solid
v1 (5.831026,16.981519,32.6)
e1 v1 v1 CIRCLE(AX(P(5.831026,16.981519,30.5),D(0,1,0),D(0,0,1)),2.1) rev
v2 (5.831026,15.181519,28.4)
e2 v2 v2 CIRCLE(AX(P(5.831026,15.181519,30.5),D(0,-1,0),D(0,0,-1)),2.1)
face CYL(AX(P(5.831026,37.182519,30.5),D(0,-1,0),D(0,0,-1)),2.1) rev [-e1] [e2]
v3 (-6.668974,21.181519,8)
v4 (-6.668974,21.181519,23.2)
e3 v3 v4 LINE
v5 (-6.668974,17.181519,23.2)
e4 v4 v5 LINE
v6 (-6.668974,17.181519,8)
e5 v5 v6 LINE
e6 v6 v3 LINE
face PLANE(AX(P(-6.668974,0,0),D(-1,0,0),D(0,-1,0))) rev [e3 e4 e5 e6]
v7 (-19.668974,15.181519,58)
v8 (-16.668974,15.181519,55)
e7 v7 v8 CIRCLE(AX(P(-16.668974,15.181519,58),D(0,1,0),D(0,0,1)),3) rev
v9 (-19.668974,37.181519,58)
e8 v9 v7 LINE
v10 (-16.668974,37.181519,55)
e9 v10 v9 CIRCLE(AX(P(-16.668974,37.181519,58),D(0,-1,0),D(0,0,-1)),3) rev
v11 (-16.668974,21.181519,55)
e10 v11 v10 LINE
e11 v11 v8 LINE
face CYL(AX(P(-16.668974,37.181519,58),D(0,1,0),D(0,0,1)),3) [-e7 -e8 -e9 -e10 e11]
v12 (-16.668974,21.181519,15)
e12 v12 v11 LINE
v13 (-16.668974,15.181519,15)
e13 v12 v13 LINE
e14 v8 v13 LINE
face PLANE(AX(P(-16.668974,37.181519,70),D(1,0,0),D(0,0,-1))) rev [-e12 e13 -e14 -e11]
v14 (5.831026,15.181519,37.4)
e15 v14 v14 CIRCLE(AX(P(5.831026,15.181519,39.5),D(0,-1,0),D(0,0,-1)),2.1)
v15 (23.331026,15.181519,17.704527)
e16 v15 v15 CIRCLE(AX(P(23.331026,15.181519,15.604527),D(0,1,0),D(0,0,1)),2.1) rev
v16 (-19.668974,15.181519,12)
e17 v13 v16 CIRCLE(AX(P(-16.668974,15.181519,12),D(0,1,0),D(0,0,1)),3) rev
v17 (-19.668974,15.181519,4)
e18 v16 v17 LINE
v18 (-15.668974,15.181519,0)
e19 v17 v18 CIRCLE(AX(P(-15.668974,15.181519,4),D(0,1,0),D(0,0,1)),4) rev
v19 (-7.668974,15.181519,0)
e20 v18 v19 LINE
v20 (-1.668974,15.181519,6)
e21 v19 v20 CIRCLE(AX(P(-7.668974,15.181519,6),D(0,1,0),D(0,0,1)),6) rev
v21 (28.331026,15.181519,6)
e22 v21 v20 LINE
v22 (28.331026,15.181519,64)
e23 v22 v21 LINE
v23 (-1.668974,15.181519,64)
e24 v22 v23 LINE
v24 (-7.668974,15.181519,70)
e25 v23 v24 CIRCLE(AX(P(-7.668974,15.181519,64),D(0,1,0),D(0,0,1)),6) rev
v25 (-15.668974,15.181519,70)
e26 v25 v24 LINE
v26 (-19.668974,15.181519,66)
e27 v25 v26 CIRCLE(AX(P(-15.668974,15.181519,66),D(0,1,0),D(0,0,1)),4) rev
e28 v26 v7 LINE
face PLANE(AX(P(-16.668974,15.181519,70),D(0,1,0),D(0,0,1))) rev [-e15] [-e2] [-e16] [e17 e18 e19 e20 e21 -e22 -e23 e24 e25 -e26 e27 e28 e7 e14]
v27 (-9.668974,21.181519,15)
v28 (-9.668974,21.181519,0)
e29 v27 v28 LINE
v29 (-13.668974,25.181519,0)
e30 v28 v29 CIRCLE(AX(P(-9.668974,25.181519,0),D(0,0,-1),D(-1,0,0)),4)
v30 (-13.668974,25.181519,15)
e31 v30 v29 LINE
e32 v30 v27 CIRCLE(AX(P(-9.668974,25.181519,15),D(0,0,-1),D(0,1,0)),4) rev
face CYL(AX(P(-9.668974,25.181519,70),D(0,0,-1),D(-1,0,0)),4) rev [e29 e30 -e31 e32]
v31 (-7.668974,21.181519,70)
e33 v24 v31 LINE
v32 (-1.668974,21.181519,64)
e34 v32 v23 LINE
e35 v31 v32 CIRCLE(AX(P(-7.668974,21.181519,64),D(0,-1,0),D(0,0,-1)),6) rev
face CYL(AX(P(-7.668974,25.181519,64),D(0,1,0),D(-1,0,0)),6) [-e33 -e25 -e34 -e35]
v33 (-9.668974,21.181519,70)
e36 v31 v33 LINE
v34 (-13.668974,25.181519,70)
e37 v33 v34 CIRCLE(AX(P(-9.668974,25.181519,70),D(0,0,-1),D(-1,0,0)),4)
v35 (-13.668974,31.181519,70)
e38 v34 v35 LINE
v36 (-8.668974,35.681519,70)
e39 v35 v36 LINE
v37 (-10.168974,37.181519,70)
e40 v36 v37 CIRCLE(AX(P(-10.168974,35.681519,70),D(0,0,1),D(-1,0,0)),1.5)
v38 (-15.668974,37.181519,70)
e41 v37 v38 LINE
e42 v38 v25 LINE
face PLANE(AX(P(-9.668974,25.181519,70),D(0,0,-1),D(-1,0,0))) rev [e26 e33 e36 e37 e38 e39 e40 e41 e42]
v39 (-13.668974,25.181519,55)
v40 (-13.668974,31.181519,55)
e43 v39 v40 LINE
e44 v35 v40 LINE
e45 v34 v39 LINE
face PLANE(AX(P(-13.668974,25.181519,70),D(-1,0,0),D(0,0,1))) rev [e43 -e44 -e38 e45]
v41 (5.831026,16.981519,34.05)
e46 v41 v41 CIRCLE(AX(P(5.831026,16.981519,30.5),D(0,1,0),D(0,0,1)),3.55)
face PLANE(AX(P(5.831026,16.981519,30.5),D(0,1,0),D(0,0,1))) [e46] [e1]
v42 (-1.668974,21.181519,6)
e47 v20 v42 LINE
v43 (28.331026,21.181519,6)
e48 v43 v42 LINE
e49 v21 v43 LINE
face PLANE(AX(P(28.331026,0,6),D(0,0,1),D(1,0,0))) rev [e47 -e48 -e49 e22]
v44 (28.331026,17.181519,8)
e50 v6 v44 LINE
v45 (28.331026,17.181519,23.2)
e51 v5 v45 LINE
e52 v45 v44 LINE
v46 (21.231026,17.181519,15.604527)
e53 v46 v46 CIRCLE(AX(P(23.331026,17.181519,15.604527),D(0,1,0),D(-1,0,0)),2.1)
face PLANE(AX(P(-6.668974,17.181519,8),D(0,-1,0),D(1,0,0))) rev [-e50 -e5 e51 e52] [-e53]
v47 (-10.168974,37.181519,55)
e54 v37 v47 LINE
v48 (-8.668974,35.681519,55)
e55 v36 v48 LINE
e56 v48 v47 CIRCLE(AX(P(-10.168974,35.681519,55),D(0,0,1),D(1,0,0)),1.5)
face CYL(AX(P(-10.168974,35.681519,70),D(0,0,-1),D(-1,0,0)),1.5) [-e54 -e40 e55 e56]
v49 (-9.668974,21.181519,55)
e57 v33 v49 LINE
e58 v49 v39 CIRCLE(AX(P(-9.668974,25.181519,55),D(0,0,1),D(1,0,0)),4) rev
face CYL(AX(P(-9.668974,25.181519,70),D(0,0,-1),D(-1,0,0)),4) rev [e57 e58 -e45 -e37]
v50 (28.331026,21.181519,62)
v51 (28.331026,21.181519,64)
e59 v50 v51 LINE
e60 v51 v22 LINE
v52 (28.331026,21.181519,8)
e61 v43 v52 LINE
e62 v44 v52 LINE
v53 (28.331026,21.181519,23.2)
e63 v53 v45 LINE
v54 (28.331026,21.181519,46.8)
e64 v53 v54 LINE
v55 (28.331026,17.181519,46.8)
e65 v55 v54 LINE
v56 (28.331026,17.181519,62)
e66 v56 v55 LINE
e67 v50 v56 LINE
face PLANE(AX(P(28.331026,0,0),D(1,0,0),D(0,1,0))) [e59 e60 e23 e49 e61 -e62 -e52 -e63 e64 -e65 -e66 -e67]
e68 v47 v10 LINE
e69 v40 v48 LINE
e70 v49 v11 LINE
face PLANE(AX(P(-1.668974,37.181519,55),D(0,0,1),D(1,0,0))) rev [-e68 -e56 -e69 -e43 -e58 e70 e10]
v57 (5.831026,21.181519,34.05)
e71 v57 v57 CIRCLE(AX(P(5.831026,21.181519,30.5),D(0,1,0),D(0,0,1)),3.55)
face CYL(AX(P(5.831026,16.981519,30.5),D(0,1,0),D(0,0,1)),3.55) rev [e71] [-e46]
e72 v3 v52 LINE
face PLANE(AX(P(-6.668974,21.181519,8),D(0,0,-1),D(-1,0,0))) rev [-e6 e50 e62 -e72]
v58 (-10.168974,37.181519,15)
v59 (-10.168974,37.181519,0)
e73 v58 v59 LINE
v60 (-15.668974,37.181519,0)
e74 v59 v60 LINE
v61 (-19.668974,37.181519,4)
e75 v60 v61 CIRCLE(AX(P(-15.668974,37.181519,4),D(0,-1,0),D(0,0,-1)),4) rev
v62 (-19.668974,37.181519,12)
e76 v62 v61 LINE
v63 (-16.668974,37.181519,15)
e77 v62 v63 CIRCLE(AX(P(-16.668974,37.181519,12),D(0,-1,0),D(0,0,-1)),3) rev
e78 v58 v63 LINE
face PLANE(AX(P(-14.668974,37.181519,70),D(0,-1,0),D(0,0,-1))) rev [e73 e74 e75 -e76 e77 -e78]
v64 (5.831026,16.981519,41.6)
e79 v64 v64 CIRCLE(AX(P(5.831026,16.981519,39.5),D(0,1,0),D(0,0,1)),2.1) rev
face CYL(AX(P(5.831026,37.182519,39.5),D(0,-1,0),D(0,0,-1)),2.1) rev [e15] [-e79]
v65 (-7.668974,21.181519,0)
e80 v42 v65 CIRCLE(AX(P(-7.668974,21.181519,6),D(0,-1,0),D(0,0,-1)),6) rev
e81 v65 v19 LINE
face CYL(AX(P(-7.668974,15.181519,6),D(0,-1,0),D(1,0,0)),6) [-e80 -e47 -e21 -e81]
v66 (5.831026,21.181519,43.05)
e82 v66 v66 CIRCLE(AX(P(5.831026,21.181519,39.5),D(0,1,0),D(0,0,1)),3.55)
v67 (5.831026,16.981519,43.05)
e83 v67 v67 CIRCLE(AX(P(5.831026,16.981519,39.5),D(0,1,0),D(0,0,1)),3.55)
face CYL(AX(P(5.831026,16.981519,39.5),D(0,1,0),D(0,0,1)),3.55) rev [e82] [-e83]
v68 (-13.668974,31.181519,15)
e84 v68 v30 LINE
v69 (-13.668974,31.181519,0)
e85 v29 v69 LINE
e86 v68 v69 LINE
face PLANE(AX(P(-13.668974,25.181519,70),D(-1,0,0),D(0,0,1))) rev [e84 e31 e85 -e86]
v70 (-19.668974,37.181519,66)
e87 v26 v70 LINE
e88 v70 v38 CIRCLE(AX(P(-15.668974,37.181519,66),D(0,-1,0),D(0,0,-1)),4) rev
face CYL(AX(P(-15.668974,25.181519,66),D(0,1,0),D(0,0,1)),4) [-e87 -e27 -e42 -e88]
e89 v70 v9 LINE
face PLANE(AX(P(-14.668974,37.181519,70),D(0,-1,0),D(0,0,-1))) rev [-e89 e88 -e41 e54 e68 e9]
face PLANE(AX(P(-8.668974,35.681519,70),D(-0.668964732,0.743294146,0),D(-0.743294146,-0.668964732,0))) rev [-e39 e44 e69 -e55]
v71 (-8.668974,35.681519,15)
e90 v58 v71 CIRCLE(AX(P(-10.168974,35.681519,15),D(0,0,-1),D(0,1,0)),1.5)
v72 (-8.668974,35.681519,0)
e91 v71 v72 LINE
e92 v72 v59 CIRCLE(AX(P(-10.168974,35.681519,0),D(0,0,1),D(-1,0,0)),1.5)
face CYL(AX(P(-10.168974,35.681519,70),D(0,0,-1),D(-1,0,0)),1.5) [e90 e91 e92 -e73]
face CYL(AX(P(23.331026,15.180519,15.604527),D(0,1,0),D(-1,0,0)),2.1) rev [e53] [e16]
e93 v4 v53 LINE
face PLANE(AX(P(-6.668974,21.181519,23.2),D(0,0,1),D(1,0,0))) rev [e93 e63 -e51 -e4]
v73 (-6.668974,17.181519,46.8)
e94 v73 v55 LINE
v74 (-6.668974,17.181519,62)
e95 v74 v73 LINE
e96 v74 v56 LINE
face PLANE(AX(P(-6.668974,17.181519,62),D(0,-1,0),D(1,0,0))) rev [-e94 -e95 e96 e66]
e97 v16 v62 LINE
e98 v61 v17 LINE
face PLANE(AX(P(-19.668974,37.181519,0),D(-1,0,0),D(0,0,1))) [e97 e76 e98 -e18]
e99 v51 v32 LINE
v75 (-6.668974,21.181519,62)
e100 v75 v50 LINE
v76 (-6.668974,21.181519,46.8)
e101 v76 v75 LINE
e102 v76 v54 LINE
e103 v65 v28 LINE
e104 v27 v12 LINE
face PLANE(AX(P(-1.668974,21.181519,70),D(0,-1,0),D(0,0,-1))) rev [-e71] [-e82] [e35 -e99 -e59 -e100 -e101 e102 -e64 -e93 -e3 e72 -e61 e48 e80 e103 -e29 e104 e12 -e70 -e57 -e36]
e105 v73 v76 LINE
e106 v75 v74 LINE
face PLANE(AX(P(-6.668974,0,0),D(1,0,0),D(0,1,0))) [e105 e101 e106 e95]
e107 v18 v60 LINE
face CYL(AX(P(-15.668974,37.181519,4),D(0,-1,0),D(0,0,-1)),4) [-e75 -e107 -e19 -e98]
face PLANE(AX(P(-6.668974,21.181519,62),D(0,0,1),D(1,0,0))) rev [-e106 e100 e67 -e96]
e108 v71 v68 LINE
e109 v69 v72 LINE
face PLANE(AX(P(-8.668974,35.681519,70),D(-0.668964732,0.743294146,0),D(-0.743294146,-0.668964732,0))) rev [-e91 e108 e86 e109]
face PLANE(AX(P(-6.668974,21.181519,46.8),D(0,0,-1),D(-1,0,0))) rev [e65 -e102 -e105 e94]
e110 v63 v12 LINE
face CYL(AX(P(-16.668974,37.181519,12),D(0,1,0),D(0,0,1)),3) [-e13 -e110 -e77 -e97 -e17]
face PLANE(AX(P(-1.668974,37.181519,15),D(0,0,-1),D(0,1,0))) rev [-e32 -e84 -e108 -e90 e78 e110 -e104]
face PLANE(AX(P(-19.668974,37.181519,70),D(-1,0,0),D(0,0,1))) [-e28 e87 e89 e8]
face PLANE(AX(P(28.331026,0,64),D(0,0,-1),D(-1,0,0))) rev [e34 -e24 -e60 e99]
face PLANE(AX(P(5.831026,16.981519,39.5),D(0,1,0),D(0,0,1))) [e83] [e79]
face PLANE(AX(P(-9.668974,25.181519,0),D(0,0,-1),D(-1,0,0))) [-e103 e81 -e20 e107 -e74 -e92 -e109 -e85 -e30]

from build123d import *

# Parameters (mm, degrees)
BOSS_EXTRU_1_DEPTH      = 70
ESQUISSE3_W             = 40
ESQUISSE3_H             = 16
ENL_V_MAT_EXTRU_1_DEPTH = 15
CONG_2_R                = 6
ESQUISSE4_W             = 58
ESQUISSE4_H             = 6
BOSS_EXTRU_2_DEPTH      = 30
ENL_V_MAT_EXTRU_2_REACH = 80.655
ESQUISSE5_R             = 2.1
ESQUISSE6_R             = 3.55
ENL_V_MAT_EXTRU_3_DEPTH = 4.2
ESQUISSE8_W             = 15.2
ESQUISSE8_H             = 4
ENL_V_MAT_EXTRU_5_DEPTH = 35
ENL_V_MAT_EXTRU_6_REACH = 80.119
ESQUISSE9_R             = 2.1
ESQUISSE10_W            = 3
ESQUISSE10_H            = 15
BOSS_EXTRU_3_DEPTH      = 22
CONG_3_R                = 3
CONG_4_R                = 4


with BuildPart() as part:
    # Esquisse1 → Boss.-Extru.1 (new body)
    with BuildSketch(Plane.XY):
        with BuildLine():
            Line((-16.668973791, 33.181519274), (-16.668973791, 15.181519274))
            Line((-16.668973791, 15.181519274), (-1.668973791, 15.181519274))
            Line((-1.668973791, 15.181519274), (-1.668973791, 21.181519274))
            Line((-1.668973791, 21.181519274), (-9.668973791, 21.181519274))
            ThreePointArc((-9.668973791, 21.181519274), (-12.497400916, 22.35309215), (-13.668973791, 25.181519274))
            Line((-13.668973791, 25.181519274), (-13.668973791, 31.181519274))
            Line((-13.668973791, 31.181519274), (-8.668973791, 35.681519274))
            ThreePointArc((-8.668973791, 35.681519274), (-9.108313619, 36.742179446), (-10.168973791, 37.181519274))
            Line((-10.168973791, 37.181519274), (-13.668973791, 37.181519274))
            Line((-13.668973791, 37.181519274), (-14.668973791, 37.181519274))
            Line((-14.668973791, 37.181519274), (-16.668973791, 37.181519274))
            Line((-16.668973791, 37.181519274), (-16.668973791, 34.181519274))
            Line((-16.668973791, 34.181519274), (-16.668973791, 33.181519274))
        make_face()
    extrude(amount=BOSS_EXTRU_1_DEPTH)

    # Esquisse3 → Enlèv. mat.-Extru.1 (cut)
    with BuildSketch(Plane.ZY.offset(16.668973791)):
        with Locations((35, 29.181519274)):
            Rectangle(ESQUISSE3_W, ESQUISSE3_H)
    extrude(amount=-ENL_V_MAT_EXTRU_1_DEPTH, mode=Mode.SUBTRACT)

    # Congé2
    cong_2_edges = [part.edges().sort_by_distance(p)[0] for p in [
        (-1.668973791, 18.181519274, 0),
        (-1.668973791, 18.181519274, 70),
    ]]
    fillet(cong_2_edges, radius=CONG_2_R)

    # Esquisse4 → Boss.-Extru.2 (add)
    with BuildSketch(Plane(origin=(-1.668973791, 0, 0), x_dir=(0, 0, -1), z_dir=(1, 0, 0))):
        with Locations((-35, 18.181519274)):
            Rectangle(ESQUISSE4_W, ESQUISSE4_H)
    extrude(amount=BOSS_EXTRU_2_DEPTH)

    # Esquisse5 → Enlèv. mat.-Extru.2 (cut, up to next)
    with BuildSketch(Plane.XZ.offset(-15.181519274), mode=Mode.PRIVATE) as enl_v_mat_extru_2_sk1:
        with Locations(Location((5.831026209, 39.5, 0), (0, 0, 270))):
            Circle(ESQUISSE5_R)
    enl_v_mat_extru_2_tool1 = extrude(enl_v_mat_extru_2_sk1.sketch, amount=-ENL_V_MAT_EXTRU_2_REACH, mode=Mode.PRIVATE) & part.part
    # Esquisse5 → Enlèv. mat.-Extru.2 (cut, up to next)
    with BuildSketch(Plane.XZ.offset(-15.181519274), mode=Mode.PRIVATE) as enl_v_mat_extru_2_sk2:
        with Locations(Location((5.831026209, 30.5, 0), (0, 0, 270))):
            Circle(ESQUISSE5_R)
    enl_v_mat_extru_2_tool2 = extrude(enl_v_mat_extru_2_sk2.sketch, amount=-ENL_V_MAT_EXTRU_2_REACH, mode=Mode.PRIVATE) & part.part
    add(enl_v_mat_extru_2_tool1.solids().sort_by_distance((5.831026, 15.181519, 39.5))[0], mode=Mode.SUBTRACT)
    add(enl_v_mat_extru_2_tool2.solids().sort_by_distance((5.831026, 15.181519, 30.5))[0], mode=Mode.SUBTRACT)

    # Esquisse6 → Enlèv. mat.-Extru.3 (cut)
    with BuildSketch(Plane(origin=(0, 21.181519274, 0), x_dir=(1, 0, 0), z_dir=(0, 1, 0))):
        with Locations(Location((5.831026209, -30.5, 0), (0, 0, 270))):
            Circle(ESQUISSE6_R)
        with Locations(Location((5.831026209, -39.5, 0), (0, 0, 270))):
            Circle(ESQUISSE6_R)
    extrude(amount=-ENL_V_MAT_EXTRU_3_DEPTH, mode=Mode.SUBTRACT)

    # Esquisse8 → Enlèv. mat.-Extru.5 (cut)
    with BuildSketch(Plane(origin=(28.331026209, 0, 0), x_dir=(0, 0, -1), z_dir=(1, 0, 0))):
        with Locations((-54.4, 19.181519274)):
            Rectangle(ESQUISSE8_W, ESQUISSE8_H)
        with Locations((-15.6, 19.181519274)):
            Rectangle(ESQUISSE8_W, ESQUISSE8_H)
    extrude(amount=-ENL_V_MAT_EXTRU_5_DEPTH, mode=Mode.SUBTRACT)

    # Esquisse9 → Enlèv. mat.-Extru.6 (cut, up to next)
    with BuildSketch(Plane(origin=(0, 17.181519274, 0), x_dir=(1, 0, 0), z_dir=(0, 1, 0)), mode=Mode.PRIVATE) as enl_v_mat_extru_6_sk1:
        with Locations(Location((23.331026209, -15.604527367, 0), (0, 0, 180))):
            Circle(ESQUISSE9_R)
    enl_v_mat_extru_6_tool1 = extrude(enl_v_mat_extru_6_sk1.sketch, amount=-ENL_V_MAT_EXTRU_6_REACH, mode=Mode.PRIVATE) & part.part
    add(enl_v_mat_extru_6_tool1.solids().sort_by_distance((23.331026, 17.181519, 15.604527))[0], mode=Mode.SUBTRACT)

    # Esquisse10 → Boss.-Extru.3 (add)
    with BuildSketch(Plane.XZ.offset(-15.181519274)):
        with Locations((-18.168973791, 62.5)):
            Rectangle(ESQUISSE10_W, ESQUISSE10_H)
        with Locations((-18.168973791, 7.5)):
            Rectangle(ESQUISSE10_W, ESQUISSE10_H)
    extrude(amount=-BOSS_EXTRU_3_DEPTH)

    # Congé3
    cong_3_edges = [part.edges().sort_by_distance(p)[0] for p in [
        (-19.668973791, 26.181519274, 55),
        (-19.668973791, 26.181519274, 15),
    ]]
    fillet(cong_3_edges, radius=CONG_3_R - 0.0001)  # a hair under: the kernel refuses the full size

    # Congé4
    cong_4_edges = [part.edges().sort_by_distance(p)[0] for p in [
        (-19.668973791, 26.181519274, 70),
        (-19.668973791, 26.181519274, 0),
    ]]
    fillet(cong_4_edges, radius=CONG_4_R)


solid = part.part
